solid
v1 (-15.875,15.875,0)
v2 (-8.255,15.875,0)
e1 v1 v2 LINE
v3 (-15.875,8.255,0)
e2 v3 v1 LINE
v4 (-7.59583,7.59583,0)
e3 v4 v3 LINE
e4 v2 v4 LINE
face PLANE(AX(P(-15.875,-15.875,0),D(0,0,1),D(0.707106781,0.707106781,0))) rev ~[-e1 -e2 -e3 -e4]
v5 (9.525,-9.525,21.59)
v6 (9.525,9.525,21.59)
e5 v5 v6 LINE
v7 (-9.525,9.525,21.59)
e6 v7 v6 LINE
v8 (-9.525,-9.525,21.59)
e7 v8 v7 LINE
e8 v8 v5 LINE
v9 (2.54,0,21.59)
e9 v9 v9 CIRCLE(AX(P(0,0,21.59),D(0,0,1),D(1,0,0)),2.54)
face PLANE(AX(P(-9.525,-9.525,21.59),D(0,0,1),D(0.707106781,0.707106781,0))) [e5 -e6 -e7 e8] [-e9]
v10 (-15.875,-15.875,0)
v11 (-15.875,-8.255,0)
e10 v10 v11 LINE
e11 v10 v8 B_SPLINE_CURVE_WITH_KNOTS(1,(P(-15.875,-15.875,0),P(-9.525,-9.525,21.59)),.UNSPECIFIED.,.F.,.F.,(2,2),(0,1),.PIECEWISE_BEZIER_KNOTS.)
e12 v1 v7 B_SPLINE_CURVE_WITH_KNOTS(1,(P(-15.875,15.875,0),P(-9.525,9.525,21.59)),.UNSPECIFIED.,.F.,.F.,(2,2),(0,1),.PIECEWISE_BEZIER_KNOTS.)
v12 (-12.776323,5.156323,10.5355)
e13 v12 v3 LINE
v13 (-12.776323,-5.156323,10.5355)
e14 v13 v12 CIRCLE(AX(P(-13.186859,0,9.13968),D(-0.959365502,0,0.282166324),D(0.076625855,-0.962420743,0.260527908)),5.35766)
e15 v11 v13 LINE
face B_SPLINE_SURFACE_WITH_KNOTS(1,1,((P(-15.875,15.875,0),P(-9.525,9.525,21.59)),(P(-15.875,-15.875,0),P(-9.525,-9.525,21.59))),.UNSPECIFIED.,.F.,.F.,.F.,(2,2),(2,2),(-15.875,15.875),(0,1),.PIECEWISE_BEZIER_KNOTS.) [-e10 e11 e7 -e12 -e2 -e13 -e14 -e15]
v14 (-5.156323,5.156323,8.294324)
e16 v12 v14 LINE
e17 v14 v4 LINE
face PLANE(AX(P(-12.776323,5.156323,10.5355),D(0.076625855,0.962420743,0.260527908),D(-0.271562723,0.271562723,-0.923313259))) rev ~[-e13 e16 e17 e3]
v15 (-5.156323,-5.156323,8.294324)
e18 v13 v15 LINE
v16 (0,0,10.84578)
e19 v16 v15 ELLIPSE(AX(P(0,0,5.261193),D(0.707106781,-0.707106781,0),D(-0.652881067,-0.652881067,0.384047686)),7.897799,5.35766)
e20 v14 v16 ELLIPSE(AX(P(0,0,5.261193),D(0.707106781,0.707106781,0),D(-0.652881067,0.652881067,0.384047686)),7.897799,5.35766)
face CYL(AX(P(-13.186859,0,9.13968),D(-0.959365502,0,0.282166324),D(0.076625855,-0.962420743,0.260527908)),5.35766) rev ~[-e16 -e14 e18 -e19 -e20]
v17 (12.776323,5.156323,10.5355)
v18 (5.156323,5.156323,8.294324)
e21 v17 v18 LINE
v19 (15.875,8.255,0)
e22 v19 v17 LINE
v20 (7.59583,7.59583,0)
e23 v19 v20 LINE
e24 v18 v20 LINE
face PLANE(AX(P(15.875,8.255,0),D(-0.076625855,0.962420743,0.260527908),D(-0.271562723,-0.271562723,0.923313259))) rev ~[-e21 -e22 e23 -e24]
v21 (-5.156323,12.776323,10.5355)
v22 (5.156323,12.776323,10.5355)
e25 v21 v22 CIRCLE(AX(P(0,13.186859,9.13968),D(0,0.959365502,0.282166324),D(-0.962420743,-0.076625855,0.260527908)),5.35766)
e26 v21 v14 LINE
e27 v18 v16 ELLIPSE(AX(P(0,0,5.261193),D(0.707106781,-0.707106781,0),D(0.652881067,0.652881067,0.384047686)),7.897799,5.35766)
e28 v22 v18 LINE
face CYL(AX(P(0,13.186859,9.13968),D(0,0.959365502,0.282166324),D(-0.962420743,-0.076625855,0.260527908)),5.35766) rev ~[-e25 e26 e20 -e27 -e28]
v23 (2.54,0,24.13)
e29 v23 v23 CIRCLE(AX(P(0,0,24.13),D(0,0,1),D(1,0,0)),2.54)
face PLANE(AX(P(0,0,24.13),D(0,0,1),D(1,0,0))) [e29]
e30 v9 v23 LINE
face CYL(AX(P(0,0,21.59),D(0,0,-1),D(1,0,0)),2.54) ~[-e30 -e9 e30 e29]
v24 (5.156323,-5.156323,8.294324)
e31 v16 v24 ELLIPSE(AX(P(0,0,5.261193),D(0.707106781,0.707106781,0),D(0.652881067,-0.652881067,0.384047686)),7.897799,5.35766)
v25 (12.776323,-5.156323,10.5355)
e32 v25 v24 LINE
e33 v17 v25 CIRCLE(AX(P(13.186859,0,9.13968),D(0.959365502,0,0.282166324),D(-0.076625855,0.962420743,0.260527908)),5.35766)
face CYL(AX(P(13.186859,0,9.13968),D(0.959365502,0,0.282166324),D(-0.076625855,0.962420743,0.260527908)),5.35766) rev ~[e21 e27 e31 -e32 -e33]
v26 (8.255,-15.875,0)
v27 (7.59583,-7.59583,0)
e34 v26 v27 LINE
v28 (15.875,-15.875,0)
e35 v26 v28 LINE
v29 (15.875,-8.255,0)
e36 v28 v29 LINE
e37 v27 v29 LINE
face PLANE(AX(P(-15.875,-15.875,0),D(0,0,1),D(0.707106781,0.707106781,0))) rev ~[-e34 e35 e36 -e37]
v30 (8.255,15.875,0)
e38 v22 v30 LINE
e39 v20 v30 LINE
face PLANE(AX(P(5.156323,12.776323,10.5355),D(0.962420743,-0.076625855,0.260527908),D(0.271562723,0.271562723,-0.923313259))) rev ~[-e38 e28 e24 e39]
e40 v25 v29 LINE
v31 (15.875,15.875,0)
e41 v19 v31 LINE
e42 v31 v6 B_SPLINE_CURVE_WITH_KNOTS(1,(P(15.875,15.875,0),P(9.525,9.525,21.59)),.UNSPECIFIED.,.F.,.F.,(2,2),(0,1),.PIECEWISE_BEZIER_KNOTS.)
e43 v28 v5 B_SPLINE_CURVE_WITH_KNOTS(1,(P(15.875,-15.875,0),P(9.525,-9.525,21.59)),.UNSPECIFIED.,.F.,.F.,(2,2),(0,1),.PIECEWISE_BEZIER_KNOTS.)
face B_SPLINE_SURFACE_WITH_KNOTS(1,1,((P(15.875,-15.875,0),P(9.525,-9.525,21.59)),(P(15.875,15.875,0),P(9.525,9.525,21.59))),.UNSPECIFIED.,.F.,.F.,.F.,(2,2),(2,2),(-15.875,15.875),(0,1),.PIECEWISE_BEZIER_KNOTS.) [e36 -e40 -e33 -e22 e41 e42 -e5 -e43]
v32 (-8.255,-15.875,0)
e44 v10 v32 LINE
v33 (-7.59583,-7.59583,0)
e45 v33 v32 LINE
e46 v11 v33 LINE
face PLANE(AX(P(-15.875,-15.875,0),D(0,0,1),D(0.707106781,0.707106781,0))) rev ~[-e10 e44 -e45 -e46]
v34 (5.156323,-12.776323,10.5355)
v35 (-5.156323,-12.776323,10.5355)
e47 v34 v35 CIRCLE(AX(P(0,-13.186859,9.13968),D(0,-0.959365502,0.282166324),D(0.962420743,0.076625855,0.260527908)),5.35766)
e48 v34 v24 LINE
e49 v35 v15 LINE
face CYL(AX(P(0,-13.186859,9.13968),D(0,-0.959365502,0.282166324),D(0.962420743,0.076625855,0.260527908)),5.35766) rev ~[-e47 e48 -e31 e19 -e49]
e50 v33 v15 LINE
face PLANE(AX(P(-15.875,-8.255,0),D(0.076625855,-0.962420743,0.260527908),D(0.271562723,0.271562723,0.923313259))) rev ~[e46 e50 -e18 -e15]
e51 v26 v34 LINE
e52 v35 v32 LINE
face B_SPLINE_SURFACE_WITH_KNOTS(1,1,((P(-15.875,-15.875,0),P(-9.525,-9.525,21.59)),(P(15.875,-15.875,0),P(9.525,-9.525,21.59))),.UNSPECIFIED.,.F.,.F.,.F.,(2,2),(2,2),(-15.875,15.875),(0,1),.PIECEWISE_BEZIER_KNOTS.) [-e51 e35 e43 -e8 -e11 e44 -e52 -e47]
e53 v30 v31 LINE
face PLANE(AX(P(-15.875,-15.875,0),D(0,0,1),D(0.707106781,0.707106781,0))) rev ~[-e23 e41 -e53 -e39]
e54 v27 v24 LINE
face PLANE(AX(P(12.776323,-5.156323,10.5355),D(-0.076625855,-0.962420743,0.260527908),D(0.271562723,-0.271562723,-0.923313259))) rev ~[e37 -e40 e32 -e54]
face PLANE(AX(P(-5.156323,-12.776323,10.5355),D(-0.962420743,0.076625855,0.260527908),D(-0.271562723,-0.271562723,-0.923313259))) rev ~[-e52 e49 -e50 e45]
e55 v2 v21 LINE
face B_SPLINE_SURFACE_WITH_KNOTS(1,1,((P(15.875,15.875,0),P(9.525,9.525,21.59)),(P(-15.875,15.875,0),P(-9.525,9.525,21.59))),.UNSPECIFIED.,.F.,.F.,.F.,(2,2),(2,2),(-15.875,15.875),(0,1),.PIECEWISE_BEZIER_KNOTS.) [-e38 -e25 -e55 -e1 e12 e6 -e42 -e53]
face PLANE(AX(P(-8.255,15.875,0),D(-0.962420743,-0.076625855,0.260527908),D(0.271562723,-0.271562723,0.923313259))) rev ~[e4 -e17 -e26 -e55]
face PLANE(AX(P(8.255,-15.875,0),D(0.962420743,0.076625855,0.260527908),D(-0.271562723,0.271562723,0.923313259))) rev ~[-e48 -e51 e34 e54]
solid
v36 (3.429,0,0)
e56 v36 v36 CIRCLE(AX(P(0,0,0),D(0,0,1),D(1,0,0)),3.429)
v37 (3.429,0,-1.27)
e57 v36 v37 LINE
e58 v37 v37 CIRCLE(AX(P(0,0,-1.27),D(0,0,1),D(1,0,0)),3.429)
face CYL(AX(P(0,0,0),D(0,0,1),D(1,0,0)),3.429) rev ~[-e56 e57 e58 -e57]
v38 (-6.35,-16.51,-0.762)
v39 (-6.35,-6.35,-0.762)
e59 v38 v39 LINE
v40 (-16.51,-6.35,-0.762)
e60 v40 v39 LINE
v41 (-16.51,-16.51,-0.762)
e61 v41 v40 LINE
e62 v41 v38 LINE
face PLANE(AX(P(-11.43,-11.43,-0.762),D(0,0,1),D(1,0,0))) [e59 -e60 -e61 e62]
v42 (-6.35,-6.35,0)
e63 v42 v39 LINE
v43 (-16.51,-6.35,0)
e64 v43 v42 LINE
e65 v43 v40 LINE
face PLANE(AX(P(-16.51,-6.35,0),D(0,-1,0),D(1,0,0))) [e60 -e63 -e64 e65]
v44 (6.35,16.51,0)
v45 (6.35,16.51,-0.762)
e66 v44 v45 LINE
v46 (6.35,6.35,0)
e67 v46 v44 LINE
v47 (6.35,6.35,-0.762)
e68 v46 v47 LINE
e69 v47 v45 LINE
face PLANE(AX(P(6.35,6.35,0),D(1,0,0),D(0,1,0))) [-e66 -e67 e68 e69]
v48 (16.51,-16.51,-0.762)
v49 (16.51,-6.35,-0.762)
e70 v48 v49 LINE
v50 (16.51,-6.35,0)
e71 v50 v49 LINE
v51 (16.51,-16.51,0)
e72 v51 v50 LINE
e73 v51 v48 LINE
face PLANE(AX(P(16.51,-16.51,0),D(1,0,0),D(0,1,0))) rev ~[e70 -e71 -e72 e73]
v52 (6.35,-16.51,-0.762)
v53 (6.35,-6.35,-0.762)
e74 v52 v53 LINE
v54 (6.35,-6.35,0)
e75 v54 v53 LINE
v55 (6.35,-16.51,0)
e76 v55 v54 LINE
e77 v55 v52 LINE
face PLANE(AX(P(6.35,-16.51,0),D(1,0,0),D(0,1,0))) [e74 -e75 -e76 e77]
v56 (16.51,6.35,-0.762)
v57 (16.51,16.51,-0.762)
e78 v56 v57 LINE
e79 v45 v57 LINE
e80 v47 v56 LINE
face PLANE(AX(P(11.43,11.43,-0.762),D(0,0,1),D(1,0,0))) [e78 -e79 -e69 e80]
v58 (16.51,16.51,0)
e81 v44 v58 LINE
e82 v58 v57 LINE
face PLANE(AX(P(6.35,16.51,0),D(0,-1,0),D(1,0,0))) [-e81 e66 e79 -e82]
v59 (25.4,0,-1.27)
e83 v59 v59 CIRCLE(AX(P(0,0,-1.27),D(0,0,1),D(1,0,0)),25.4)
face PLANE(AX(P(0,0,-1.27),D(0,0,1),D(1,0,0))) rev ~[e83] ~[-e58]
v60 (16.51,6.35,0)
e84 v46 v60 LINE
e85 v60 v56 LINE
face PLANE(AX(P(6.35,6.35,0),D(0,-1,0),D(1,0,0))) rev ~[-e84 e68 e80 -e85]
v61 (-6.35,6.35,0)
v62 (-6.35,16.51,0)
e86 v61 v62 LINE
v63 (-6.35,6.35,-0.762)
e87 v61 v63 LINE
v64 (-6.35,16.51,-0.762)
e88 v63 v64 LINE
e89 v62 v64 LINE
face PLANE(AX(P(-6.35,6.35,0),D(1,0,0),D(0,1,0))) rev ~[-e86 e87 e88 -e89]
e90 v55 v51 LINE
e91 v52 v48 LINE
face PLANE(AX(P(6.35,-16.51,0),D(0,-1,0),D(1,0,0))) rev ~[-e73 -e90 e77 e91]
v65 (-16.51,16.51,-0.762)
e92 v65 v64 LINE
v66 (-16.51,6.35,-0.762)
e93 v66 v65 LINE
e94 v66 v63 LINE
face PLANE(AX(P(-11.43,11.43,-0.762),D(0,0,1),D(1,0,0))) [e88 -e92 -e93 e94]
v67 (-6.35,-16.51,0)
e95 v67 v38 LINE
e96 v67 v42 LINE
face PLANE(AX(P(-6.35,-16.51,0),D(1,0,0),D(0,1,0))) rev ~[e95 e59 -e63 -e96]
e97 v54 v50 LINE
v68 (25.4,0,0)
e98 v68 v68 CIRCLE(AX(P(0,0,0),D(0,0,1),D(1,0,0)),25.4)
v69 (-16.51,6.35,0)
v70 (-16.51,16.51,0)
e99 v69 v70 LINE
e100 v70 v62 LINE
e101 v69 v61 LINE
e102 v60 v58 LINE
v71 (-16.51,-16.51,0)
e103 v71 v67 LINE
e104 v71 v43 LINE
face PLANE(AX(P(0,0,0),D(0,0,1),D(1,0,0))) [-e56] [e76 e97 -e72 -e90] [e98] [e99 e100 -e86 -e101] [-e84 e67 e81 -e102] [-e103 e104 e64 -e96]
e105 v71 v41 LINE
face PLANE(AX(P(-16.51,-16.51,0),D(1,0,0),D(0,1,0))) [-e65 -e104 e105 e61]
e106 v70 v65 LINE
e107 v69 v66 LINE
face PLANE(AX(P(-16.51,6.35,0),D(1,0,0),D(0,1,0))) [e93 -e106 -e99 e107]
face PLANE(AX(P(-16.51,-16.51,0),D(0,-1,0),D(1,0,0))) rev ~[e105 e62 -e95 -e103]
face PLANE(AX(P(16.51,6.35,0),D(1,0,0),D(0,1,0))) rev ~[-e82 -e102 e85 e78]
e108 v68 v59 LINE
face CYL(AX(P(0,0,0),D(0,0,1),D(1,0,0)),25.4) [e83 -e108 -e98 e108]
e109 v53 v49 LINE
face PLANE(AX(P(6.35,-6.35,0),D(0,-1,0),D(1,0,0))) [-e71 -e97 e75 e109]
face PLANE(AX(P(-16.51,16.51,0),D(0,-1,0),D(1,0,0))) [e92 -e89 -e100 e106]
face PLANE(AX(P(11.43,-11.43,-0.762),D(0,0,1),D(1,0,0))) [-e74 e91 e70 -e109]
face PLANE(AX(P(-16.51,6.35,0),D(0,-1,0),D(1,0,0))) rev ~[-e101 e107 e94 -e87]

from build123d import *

# Parameters (mm, degrees)
F0_R      = 25.4
F1_DEPTH  = 1.27
F2_W      = 31.75
F2_H      = 31.75
F4_W      = 19.05
F4_H      = 19.05
F10_DEPTH = 74.422
F11_DEPTH = 67.7926
F12_DEPTH = 25.4
F13_DEPTH = 25.4
F14_W     = 10.16
F14_H     = 10.16
F15_DEPTH = 0.762
F16_R     = 2.54
F17_DEPTH = 2.54
F18_R     = 3.429
F19_DEPTH = 25.4


with BuildPart() as f1:
    # F0 (on Top) → F1 (new body)
    with BuildSketch(Plane.XY):
        Circle(F0_R)
    extrude(amount=-F1_DEPTH)

    # F14 (on face) → F15 (cut)
    with BuildSketch(Plane.XY):
        with Locations((11.43, 11.43)):
            Rectangle(F14_W, F14_H)
        with Locations((11.43, -11.43)):
            Rectangle(F14_W, F14_H)
        with Locations((-11.43, 11.43)):
            Rectangle(F14_W, F14_H)
        with Locations((-11.43, -11.43)):
            Rectangle(F14_W, F14_H)
    extrude(amount=-F15_DEPTH, mode=Mode.SUBTRACT)

    # F18 (on face) → F19 (cut)
    with BuildSketch(Plane.XY):
        Circle(F18_R)
    extrude(amount=-F19_DEPTH, mode=Mode.SUBTRACT)


with BuildPart() as f5:
    # F2 (on Top) → F5 section 0
    with BuildSketch(Plane.XY):
        Rectangle(F2_W, F2_H)
    # F4 (on offset) → F5 section 1
    with BuildSketch(Plane.XY.offset(21.59)):
        Rectangle(F4_W, F4_H)
    loft()

    # F9 (on face) → F10 (cut)
    with BuildSketch(Plane(origin=(14.611066879, 0, 4.2973726115), x_dir=(0, 1, 0), z_dir=(0.9593655016, 0, 0.282166324))):
        with BuildLine():
            Line((-8.255, -4.4793903934), (8.255, -4.4793903934))
            Line((8.255, -4.4793903934), (5.1563233946, 6.5023474752))
            ThreePointArc((5.1563233946, 6.5023474752), (0, 10.4050669429), (-5.1563233946, 6.5023474752))
            Line((-5.1563233946, 6.5023474752), (-8.255, -4.4793903934))
        make_face()
    extrude(amount=-F10_DEPTH, mode=Mode.SUBTRACT)

    # F6 (on face) → F11 (cut)
    with BuildSketch(Plane(origin=(0, -14.611066879, 4.2973726115), x_dir=(1, 0, 0), z_dir=(0, -0.9593655016, 0.282166324))):
        with BuildLine():
            Line((-8.255, -4.4793903934), (8.255, -4.4793903934))
            Line((8.255, -4.4793903934), (5.1563233946, 6.5023474752))
            ThreePointArc((5.1563233946, 6.5023474752), (0, 10.4050669429), (-5.1563233946, 6.5023474752))
            Line((-5.1563233946, 6.5023474752), (-8.255, -4.4793903934))
        make_face()
    extrude(amount=-F11_DEPTH, mode=Mode.SUBTRACT)

    # F7 (on face) → F12 (cut)
    with BuildSketch(Plane(origin=(0, 14.611066879, 4.2973726115), x_dir=(-1, 0, 0), z_dir=(0, 0.9593655016, 0.282166324))):
        with BuildLine():
            Line((-8.255, -4.4793903934), (8.255, -4.4793903934))
            Line((8.255, -4.4793903934), (5.1563233946, 6.5023474752))
            ThreePointArc((5.1563233946, 6.5023474752), (0, 10.4050669429), (-5.1563233946, 6.5023474752))
            Line((-5.1563233946, 6.5023474752), (-8.255, -4.4793903934))
        make_face()
    extrude(amount=-F12_DEPTH, mode=Mode.SUBTRACT)

    # F8 (on face) → F13 (cut)
    with BuildSketch(Plane(origin=(-14.611066879, 0, 4.2973726115), x_dir=(0, -1, 0), z_dir=(-0.9593655016, 0, 0.282166324))):
        with BuildLine():
            Line((-5.1563233946, 6.5023474752), (-8.255, -4.4793903934))
            Line((-8.255, -4.4793903934), (8.255, -4.4793903934))
            Line((8.255, -4.4793903934), (5.1563233946, 6.5023474752))
            ThreePointArc((5.1563233946, 6.5023474752), (0, 10.4050669429), (-5.1563233946, 6.5023474752))
        make_face()
    extrude(amount=-F13_DEPTH, mode=Mode.SUBTRACT)

    # F16 (on face) → F17 (join)
    with BuildSketch(Plane.XY.offset(21.59)):
        Circle(F16_R)
    extrude(amount=F17_DEPTH)


solid = Compound([f1.part, f5.part])
